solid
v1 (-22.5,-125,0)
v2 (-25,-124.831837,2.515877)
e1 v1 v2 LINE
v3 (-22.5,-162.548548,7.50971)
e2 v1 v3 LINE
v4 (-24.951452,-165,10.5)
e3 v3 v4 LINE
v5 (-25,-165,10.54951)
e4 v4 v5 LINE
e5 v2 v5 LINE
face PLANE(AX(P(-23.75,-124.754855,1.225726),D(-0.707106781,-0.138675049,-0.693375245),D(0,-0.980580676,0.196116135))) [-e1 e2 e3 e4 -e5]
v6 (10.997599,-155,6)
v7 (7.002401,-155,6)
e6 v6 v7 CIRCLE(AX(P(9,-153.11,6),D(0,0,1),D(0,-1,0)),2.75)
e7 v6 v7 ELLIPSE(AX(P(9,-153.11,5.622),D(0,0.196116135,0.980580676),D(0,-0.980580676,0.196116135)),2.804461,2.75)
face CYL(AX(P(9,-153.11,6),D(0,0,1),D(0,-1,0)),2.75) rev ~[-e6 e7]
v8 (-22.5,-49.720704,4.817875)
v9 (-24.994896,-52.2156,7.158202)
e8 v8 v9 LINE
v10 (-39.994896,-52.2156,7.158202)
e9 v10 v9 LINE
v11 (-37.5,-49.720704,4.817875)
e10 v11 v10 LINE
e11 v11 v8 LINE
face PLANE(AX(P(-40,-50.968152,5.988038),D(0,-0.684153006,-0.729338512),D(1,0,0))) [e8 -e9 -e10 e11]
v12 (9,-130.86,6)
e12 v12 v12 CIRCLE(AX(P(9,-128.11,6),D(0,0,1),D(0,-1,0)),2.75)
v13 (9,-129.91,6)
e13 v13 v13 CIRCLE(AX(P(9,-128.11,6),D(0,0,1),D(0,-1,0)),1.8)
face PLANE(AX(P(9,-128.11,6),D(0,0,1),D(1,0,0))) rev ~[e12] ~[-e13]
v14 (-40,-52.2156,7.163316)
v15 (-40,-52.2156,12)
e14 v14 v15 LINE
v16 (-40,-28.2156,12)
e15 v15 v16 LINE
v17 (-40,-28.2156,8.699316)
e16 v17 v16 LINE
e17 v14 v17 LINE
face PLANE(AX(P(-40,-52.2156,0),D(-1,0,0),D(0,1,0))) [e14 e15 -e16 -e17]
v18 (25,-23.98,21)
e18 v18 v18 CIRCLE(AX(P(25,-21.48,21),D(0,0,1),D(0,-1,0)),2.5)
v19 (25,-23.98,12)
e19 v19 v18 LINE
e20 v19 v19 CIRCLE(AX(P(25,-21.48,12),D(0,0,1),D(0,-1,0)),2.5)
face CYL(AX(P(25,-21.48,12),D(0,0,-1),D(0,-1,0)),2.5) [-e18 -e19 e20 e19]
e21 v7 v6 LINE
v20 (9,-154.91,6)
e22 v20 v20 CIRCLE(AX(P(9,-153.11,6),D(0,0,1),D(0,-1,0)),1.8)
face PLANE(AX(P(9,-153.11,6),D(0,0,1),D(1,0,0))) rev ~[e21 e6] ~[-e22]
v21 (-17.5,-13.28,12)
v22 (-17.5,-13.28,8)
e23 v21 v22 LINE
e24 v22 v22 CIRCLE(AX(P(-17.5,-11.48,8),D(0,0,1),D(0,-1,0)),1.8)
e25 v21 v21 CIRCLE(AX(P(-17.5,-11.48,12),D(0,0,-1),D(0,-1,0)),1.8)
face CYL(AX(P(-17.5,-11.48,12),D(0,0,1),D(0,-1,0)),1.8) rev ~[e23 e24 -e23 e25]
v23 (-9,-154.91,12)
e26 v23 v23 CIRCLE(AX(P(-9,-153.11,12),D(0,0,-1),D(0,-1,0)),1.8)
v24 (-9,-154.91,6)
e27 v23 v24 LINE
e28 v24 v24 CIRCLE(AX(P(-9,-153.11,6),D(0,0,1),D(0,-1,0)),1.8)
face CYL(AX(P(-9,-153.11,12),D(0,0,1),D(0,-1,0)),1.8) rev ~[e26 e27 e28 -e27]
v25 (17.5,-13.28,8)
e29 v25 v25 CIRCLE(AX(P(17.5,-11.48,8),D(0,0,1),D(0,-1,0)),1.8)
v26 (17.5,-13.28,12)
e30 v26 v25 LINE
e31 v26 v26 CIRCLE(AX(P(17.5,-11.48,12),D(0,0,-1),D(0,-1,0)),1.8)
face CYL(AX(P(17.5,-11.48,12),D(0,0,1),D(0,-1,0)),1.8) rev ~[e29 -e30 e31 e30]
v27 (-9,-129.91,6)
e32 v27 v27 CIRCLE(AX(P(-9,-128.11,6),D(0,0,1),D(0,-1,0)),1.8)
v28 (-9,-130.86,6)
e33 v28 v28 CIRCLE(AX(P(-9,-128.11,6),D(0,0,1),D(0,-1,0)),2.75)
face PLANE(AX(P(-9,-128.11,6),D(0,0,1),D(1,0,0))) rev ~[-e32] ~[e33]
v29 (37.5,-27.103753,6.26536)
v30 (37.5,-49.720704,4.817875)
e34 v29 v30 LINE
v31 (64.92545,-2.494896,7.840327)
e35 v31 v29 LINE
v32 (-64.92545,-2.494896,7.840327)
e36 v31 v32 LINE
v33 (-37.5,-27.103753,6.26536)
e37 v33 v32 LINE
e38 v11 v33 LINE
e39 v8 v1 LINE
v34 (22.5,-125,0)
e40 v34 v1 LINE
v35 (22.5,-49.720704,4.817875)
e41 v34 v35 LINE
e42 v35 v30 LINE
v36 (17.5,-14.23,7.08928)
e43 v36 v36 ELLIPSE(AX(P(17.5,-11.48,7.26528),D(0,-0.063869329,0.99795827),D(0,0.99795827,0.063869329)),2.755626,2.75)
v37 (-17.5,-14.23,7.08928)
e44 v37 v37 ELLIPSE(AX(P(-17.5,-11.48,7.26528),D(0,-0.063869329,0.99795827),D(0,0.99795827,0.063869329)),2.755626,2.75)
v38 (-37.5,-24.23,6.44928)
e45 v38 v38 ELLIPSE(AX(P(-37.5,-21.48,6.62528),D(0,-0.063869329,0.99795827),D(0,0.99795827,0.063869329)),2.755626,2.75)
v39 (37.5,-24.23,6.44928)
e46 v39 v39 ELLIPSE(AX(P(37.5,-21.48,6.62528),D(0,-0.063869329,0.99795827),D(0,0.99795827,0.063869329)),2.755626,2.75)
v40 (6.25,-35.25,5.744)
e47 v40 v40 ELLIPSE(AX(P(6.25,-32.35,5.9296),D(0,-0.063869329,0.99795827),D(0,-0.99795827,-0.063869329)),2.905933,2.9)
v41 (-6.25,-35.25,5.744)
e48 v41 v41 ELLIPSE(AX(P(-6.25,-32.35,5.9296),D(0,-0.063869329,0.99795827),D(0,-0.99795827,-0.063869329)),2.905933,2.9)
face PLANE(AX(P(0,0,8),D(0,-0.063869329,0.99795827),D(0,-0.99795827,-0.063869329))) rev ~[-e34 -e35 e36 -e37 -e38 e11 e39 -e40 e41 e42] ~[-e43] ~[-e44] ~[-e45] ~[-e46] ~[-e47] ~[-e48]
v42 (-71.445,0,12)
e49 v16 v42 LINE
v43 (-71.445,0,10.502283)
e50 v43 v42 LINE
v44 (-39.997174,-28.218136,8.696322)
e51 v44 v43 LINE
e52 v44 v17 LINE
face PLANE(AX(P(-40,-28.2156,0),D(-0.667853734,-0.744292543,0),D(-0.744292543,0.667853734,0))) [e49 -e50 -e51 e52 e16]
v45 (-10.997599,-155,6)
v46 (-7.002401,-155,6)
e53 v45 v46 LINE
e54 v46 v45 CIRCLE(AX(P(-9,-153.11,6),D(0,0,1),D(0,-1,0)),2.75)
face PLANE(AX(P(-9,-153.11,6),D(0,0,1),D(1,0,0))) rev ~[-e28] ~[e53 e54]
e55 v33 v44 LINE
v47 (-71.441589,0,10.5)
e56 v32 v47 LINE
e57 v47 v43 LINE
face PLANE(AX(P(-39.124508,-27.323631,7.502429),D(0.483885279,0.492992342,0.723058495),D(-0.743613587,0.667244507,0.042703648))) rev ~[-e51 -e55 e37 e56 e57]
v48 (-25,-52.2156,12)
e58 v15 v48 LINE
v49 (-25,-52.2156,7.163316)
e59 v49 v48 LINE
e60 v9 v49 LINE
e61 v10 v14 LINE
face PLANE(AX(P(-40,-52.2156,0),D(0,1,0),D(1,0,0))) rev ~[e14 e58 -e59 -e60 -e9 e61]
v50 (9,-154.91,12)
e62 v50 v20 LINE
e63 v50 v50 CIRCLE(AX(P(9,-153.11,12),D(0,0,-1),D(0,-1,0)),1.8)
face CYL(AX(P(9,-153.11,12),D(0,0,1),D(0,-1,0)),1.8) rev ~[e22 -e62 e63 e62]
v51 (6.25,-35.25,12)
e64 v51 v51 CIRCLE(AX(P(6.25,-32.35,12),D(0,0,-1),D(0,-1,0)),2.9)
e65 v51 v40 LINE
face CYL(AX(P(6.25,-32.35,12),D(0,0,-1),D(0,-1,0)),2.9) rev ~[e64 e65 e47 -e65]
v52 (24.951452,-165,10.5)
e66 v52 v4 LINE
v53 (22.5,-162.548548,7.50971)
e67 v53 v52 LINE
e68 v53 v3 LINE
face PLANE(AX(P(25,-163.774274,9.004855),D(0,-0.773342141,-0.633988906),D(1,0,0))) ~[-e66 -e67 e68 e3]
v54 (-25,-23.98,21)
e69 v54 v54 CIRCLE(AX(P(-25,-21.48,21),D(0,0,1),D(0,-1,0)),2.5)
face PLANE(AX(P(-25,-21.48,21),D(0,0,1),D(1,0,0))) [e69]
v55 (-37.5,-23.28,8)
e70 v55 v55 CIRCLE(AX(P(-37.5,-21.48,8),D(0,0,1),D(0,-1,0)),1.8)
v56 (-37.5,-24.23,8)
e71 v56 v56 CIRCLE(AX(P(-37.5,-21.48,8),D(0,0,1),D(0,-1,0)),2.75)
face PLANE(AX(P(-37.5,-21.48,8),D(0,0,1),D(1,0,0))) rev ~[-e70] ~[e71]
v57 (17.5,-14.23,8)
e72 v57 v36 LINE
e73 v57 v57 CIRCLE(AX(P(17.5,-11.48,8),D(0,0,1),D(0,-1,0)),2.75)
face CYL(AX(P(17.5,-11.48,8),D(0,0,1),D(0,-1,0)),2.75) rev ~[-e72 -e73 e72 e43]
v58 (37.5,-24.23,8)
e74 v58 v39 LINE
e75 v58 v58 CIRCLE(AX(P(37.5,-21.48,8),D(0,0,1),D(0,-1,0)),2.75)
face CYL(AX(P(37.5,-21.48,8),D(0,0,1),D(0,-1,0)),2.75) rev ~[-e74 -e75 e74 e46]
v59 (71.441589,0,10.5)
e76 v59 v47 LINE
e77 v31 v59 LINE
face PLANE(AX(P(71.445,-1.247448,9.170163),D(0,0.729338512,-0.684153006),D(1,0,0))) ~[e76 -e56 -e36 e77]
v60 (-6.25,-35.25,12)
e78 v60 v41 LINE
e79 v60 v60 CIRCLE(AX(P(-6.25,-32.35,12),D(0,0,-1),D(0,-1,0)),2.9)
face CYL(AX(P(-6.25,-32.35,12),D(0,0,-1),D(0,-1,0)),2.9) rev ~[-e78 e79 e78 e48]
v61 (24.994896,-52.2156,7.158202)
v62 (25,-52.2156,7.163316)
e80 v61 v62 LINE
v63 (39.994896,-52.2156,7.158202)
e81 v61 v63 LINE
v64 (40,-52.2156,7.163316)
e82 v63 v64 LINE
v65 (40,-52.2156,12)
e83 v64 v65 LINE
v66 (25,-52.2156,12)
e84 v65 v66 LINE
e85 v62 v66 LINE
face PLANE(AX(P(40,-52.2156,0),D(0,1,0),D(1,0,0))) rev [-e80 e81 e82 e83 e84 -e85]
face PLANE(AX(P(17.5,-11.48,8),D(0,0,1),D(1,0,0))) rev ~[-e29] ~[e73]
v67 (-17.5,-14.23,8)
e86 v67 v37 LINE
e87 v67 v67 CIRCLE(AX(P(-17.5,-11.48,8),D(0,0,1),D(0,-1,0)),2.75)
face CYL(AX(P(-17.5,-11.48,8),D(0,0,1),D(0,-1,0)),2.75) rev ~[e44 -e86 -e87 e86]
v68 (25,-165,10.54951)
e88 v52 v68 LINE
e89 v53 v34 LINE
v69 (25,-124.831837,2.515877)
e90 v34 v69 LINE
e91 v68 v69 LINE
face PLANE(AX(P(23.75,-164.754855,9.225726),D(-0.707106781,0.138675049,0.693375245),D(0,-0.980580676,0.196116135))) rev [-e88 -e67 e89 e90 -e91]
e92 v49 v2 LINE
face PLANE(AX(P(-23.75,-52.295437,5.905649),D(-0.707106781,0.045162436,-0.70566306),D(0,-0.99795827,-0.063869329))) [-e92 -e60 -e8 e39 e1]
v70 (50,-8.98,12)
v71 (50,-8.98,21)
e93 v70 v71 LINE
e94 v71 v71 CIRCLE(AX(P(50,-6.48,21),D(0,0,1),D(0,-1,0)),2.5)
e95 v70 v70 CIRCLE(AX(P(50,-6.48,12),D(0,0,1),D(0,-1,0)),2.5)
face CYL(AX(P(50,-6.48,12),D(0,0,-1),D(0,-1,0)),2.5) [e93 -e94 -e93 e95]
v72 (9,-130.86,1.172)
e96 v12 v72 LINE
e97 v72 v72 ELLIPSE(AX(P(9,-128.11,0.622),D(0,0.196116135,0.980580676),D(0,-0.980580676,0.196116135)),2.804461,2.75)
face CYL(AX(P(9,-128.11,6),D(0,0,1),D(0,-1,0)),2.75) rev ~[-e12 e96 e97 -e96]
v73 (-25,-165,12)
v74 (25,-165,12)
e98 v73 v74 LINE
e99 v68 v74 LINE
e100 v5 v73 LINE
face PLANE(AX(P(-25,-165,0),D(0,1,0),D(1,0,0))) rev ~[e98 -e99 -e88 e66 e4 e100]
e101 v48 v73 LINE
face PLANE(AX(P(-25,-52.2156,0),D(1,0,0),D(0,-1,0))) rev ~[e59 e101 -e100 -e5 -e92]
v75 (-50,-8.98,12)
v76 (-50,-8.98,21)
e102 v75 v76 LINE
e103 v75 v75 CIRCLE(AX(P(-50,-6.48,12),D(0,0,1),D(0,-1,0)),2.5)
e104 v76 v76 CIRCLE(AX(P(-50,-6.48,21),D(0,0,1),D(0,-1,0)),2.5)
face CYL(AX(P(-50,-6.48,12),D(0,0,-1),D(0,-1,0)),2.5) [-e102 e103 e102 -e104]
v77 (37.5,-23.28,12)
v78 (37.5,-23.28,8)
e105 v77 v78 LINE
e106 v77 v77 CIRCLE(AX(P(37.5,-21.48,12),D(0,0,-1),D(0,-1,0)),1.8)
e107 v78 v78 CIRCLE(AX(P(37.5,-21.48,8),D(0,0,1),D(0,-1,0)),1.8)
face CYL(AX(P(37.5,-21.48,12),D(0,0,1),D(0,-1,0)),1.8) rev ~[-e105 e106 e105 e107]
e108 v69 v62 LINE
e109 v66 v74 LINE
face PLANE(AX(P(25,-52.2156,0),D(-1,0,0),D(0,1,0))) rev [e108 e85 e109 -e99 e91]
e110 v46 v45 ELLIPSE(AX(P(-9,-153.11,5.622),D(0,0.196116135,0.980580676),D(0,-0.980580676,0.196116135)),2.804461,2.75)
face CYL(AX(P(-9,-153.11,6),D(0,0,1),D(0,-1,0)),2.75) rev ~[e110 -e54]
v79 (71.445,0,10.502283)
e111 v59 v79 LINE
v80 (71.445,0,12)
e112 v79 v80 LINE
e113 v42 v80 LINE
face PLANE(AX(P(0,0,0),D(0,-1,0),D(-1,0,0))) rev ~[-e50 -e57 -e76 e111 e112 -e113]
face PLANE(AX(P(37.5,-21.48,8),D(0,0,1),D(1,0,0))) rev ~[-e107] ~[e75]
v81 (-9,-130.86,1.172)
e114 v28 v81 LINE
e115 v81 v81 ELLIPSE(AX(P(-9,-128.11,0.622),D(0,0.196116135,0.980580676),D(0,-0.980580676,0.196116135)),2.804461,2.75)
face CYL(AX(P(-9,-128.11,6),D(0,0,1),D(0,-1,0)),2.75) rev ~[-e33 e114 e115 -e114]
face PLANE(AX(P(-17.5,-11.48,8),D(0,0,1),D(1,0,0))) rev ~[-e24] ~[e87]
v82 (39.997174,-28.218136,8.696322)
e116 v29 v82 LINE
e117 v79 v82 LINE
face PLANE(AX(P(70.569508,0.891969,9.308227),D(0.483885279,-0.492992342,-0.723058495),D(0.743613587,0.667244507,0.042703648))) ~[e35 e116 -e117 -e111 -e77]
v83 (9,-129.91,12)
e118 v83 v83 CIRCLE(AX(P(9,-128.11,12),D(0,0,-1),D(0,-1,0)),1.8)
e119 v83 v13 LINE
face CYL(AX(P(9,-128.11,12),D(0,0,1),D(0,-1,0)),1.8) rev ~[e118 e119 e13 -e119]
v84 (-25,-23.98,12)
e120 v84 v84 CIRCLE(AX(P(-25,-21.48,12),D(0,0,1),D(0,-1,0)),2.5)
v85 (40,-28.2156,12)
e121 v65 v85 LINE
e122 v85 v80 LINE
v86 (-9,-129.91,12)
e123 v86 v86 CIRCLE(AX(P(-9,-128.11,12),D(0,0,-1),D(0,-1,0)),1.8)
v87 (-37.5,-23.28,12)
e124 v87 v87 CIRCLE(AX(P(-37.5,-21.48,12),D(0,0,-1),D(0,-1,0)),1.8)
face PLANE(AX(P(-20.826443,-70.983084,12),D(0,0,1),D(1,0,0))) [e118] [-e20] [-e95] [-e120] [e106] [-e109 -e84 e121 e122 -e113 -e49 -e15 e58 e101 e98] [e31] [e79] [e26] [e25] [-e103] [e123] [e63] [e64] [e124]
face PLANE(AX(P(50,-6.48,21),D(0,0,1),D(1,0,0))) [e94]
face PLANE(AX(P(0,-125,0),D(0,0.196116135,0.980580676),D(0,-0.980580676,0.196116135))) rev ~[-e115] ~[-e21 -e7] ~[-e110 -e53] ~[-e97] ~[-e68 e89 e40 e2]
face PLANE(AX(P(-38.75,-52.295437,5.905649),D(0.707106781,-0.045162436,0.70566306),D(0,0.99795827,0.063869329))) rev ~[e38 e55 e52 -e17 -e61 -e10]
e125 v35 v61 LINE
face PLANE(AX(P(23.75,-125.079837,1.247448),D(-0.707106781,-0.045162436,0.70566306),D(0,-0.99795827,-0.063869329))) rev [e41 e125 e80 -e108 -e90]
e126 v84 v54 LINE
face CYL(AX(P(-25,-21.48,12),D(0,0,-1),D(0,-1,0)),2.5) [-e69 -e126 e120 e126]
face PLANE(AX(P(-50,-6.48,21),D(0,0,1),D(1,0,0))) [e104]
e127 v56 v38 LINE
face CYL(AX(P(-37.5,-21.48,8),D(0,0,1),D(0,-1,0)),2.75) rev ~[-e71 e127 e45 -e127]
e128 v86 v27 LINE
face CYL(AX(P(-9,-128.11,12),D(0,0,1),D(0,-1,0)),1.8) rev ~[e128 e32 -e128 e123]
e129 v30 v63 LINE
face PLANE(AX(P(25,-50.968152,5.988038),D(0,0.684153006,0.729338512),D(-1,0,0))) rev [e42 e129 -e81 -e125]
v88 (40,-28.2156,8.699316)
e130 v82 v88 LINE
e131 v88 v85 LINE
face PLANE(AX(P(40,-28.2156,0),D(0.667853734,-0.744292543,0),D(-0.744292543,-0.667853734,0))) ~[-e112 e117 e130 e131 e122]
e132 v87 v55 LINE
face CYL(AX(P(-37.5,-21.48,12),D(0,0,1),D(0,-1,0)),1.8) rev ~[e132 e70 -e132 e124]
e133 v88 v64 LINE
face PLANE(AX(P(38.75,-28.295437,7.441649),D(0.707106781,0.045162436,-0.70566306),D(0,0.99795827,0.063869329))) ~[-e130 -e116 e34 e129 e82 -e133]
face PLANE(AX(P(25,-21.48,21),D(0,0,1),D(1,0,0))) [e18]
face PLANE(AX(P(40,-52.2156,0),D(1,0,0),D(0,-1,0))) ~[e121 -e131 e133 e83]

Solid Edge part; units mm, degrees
sketch "Sketch1" plane through (0, 0, 0) normal (0, 0, 1) x (1, 0, 0)
  line L0 (0, 0) -> (-71.445, 0)
  line L1 (-40, -28.2156) -> (-71.445, 0)
  line L2 (-40, -52.2156) -> (-40, -28.2156)
  line L3 (-40, -52.2156) -> (-25, -52.2156)
  line L4 (-25, -52.2156) -> (-25, -165)
  line L5 (-25, -165) -> (0, -165)
  line L6 (0, -165) -> (0, 0)
  dimension "D1" = 15
  dimension "D2" = 165
  dimension "D3" = 24
  dimension "D4" = 71.445
extrude "Protrusion1" add sketch "Sketch1" along normal blind 12
sketch "Sketch2" plane through (0, -70, 6) normal (1, 0, 0) x (0, 1, 0)
  line L0 (70, 2) -> (-55, -6)
  line L1 (-55, -6) -> (-95, 2)
  dimension "D1" = 4
  dimension "D2" = 4
  dimension "D3" = 125
extrude "Extrusionsausschnitt_1" cut sketch "Sketch2" against normal blind 220 material side at (0, -62.4968, 3.9501)
mirror "Mirror1" about plane through (0, 0, 0) normal (-1, 0, 0) of "Protrusion1", "Extrusionsausschnitt_1"
chamfer "Fase_2" distance 2.5 angle 45 12 edges at (25, -88.6078, 2.3291) (25, -145, 4) (0, -165, 8) (-25, -145, 4) (-25, -88.6078, 2.3291) (-32.5, -52.2156, 4.6582) (32.5, -52.2156, 4.6582) (0, 0, 8) (40, -40.2156, 5.4262) (55.7225, -14.1078, 7.0971) (-40, -40.2156, 5.4262) (-55.7225, -14.1078, 7.0971)
sketch "Sketch3" plane through (0, -82.5, 12) normal (0, 0, 1) x (0, -1, 0)
  circle A0 centre (-76.02, 50) radius 2.5
  circle A1 centre (-61.02, 25) radius 2.5
  circle A2 centre (-61.02, -25) radius 2.5
  circle A3 centre (-76.02, -50) radius 2.5
  dimension "D1" = 21.48
  dimension "D2" = 50
  dimension "D3" = 25
  dimension "D4" = 100
  dimension "D5" = 50
  dimension "D6" = 15
  dimension "D7" = 5
  dimension "D8" = 5
  dimension "D9" = 5
  dimension "D10" = 5
extrude "Extrusionsausprägung_3" add sketch "Sketch3" along normal blind 9
hole "Bohrung_1" at (37.5, -21.48, 12) direction (0, 0, -1) diameter 3.6 end up to next
hole "Hole1" at (-37.5, -21.48, 12) direction (0, 0, -1) diameter 3.6 end up to next
hole "Hole2" at (-17.5, -11.48, 12) direction (0, 0, -1) diameter 3.6 end up to next
hole "Hole3" at (17.5, -11.48, 12) direction (0, 0, -1) diameter 3.6 end up to next
hole "Bohrung_5" at (-6.25, -32.35, 12) direction (0, 0, -1) diameter 5.8 depth 7
hole "Hole4" at (6.25, -32.35, 12) direction (0, 0, -1) diameter 5.8 depth 7
sketch "Sketch4" plane through (0, -82.5, 8) normal (0, 0, 1) x (0, -1, 0)
  circle A0 centre (-61.02, 37.5) radius 2.75
  circle A1 centre (-71.02, 17.5) radius 2.75
  circle A2 centre (-71.02, -17.5) radius 2.75
  circle A3 centre (-61.02, -37.5) radius 2.75
  dimension "D1" = 5.5
  dimension "D2" = 5.5
  dimension "D3" = 5.5
  dimension "D4" = 5.5
extrude "Extrusionsausschnitt_3" cut sketch "Sketch4" against normal blind 10
hole "Bohrung_7" at (9, -153.11, 12) direction (0, 0, -1) diameter 3.6 end up to next
hole "Hole5" at (-9, -153.11, 12) direction (0, 0, -1) diameter 3.6 end up to next
hole "Hole6" at (-9, -128.11, 12) direction (0, 0, -1) diameter 3.6 end up to next
hole "Hole7" at (9, -128.11, 12) direction (0, 0, -1) diameter 3.6 end up to next
sketch "Sketch5" plane through (0, -82.5, 6) normal (0, 0, 1) x (0, -1, 0)
  circle A0 centre (45.61, 9) radius 2.75
  circle A1 centre (70.61, 9) radius 2.75
  circle A2 centre (70.61, -9) radius 2.75
  circle A3 centre (45.61, -9) radius 2.75
  dimension "D1" = 5.5
  dimension "D2" = 5.5
  dimension "D3" = 5.5
  dimension "D4" = 5.5
extrude "Extrusionsausschnitt_4" cut sketch "Sketch5" against normal blind 17.8534
properties part number "49" material "Polyacticacid"
